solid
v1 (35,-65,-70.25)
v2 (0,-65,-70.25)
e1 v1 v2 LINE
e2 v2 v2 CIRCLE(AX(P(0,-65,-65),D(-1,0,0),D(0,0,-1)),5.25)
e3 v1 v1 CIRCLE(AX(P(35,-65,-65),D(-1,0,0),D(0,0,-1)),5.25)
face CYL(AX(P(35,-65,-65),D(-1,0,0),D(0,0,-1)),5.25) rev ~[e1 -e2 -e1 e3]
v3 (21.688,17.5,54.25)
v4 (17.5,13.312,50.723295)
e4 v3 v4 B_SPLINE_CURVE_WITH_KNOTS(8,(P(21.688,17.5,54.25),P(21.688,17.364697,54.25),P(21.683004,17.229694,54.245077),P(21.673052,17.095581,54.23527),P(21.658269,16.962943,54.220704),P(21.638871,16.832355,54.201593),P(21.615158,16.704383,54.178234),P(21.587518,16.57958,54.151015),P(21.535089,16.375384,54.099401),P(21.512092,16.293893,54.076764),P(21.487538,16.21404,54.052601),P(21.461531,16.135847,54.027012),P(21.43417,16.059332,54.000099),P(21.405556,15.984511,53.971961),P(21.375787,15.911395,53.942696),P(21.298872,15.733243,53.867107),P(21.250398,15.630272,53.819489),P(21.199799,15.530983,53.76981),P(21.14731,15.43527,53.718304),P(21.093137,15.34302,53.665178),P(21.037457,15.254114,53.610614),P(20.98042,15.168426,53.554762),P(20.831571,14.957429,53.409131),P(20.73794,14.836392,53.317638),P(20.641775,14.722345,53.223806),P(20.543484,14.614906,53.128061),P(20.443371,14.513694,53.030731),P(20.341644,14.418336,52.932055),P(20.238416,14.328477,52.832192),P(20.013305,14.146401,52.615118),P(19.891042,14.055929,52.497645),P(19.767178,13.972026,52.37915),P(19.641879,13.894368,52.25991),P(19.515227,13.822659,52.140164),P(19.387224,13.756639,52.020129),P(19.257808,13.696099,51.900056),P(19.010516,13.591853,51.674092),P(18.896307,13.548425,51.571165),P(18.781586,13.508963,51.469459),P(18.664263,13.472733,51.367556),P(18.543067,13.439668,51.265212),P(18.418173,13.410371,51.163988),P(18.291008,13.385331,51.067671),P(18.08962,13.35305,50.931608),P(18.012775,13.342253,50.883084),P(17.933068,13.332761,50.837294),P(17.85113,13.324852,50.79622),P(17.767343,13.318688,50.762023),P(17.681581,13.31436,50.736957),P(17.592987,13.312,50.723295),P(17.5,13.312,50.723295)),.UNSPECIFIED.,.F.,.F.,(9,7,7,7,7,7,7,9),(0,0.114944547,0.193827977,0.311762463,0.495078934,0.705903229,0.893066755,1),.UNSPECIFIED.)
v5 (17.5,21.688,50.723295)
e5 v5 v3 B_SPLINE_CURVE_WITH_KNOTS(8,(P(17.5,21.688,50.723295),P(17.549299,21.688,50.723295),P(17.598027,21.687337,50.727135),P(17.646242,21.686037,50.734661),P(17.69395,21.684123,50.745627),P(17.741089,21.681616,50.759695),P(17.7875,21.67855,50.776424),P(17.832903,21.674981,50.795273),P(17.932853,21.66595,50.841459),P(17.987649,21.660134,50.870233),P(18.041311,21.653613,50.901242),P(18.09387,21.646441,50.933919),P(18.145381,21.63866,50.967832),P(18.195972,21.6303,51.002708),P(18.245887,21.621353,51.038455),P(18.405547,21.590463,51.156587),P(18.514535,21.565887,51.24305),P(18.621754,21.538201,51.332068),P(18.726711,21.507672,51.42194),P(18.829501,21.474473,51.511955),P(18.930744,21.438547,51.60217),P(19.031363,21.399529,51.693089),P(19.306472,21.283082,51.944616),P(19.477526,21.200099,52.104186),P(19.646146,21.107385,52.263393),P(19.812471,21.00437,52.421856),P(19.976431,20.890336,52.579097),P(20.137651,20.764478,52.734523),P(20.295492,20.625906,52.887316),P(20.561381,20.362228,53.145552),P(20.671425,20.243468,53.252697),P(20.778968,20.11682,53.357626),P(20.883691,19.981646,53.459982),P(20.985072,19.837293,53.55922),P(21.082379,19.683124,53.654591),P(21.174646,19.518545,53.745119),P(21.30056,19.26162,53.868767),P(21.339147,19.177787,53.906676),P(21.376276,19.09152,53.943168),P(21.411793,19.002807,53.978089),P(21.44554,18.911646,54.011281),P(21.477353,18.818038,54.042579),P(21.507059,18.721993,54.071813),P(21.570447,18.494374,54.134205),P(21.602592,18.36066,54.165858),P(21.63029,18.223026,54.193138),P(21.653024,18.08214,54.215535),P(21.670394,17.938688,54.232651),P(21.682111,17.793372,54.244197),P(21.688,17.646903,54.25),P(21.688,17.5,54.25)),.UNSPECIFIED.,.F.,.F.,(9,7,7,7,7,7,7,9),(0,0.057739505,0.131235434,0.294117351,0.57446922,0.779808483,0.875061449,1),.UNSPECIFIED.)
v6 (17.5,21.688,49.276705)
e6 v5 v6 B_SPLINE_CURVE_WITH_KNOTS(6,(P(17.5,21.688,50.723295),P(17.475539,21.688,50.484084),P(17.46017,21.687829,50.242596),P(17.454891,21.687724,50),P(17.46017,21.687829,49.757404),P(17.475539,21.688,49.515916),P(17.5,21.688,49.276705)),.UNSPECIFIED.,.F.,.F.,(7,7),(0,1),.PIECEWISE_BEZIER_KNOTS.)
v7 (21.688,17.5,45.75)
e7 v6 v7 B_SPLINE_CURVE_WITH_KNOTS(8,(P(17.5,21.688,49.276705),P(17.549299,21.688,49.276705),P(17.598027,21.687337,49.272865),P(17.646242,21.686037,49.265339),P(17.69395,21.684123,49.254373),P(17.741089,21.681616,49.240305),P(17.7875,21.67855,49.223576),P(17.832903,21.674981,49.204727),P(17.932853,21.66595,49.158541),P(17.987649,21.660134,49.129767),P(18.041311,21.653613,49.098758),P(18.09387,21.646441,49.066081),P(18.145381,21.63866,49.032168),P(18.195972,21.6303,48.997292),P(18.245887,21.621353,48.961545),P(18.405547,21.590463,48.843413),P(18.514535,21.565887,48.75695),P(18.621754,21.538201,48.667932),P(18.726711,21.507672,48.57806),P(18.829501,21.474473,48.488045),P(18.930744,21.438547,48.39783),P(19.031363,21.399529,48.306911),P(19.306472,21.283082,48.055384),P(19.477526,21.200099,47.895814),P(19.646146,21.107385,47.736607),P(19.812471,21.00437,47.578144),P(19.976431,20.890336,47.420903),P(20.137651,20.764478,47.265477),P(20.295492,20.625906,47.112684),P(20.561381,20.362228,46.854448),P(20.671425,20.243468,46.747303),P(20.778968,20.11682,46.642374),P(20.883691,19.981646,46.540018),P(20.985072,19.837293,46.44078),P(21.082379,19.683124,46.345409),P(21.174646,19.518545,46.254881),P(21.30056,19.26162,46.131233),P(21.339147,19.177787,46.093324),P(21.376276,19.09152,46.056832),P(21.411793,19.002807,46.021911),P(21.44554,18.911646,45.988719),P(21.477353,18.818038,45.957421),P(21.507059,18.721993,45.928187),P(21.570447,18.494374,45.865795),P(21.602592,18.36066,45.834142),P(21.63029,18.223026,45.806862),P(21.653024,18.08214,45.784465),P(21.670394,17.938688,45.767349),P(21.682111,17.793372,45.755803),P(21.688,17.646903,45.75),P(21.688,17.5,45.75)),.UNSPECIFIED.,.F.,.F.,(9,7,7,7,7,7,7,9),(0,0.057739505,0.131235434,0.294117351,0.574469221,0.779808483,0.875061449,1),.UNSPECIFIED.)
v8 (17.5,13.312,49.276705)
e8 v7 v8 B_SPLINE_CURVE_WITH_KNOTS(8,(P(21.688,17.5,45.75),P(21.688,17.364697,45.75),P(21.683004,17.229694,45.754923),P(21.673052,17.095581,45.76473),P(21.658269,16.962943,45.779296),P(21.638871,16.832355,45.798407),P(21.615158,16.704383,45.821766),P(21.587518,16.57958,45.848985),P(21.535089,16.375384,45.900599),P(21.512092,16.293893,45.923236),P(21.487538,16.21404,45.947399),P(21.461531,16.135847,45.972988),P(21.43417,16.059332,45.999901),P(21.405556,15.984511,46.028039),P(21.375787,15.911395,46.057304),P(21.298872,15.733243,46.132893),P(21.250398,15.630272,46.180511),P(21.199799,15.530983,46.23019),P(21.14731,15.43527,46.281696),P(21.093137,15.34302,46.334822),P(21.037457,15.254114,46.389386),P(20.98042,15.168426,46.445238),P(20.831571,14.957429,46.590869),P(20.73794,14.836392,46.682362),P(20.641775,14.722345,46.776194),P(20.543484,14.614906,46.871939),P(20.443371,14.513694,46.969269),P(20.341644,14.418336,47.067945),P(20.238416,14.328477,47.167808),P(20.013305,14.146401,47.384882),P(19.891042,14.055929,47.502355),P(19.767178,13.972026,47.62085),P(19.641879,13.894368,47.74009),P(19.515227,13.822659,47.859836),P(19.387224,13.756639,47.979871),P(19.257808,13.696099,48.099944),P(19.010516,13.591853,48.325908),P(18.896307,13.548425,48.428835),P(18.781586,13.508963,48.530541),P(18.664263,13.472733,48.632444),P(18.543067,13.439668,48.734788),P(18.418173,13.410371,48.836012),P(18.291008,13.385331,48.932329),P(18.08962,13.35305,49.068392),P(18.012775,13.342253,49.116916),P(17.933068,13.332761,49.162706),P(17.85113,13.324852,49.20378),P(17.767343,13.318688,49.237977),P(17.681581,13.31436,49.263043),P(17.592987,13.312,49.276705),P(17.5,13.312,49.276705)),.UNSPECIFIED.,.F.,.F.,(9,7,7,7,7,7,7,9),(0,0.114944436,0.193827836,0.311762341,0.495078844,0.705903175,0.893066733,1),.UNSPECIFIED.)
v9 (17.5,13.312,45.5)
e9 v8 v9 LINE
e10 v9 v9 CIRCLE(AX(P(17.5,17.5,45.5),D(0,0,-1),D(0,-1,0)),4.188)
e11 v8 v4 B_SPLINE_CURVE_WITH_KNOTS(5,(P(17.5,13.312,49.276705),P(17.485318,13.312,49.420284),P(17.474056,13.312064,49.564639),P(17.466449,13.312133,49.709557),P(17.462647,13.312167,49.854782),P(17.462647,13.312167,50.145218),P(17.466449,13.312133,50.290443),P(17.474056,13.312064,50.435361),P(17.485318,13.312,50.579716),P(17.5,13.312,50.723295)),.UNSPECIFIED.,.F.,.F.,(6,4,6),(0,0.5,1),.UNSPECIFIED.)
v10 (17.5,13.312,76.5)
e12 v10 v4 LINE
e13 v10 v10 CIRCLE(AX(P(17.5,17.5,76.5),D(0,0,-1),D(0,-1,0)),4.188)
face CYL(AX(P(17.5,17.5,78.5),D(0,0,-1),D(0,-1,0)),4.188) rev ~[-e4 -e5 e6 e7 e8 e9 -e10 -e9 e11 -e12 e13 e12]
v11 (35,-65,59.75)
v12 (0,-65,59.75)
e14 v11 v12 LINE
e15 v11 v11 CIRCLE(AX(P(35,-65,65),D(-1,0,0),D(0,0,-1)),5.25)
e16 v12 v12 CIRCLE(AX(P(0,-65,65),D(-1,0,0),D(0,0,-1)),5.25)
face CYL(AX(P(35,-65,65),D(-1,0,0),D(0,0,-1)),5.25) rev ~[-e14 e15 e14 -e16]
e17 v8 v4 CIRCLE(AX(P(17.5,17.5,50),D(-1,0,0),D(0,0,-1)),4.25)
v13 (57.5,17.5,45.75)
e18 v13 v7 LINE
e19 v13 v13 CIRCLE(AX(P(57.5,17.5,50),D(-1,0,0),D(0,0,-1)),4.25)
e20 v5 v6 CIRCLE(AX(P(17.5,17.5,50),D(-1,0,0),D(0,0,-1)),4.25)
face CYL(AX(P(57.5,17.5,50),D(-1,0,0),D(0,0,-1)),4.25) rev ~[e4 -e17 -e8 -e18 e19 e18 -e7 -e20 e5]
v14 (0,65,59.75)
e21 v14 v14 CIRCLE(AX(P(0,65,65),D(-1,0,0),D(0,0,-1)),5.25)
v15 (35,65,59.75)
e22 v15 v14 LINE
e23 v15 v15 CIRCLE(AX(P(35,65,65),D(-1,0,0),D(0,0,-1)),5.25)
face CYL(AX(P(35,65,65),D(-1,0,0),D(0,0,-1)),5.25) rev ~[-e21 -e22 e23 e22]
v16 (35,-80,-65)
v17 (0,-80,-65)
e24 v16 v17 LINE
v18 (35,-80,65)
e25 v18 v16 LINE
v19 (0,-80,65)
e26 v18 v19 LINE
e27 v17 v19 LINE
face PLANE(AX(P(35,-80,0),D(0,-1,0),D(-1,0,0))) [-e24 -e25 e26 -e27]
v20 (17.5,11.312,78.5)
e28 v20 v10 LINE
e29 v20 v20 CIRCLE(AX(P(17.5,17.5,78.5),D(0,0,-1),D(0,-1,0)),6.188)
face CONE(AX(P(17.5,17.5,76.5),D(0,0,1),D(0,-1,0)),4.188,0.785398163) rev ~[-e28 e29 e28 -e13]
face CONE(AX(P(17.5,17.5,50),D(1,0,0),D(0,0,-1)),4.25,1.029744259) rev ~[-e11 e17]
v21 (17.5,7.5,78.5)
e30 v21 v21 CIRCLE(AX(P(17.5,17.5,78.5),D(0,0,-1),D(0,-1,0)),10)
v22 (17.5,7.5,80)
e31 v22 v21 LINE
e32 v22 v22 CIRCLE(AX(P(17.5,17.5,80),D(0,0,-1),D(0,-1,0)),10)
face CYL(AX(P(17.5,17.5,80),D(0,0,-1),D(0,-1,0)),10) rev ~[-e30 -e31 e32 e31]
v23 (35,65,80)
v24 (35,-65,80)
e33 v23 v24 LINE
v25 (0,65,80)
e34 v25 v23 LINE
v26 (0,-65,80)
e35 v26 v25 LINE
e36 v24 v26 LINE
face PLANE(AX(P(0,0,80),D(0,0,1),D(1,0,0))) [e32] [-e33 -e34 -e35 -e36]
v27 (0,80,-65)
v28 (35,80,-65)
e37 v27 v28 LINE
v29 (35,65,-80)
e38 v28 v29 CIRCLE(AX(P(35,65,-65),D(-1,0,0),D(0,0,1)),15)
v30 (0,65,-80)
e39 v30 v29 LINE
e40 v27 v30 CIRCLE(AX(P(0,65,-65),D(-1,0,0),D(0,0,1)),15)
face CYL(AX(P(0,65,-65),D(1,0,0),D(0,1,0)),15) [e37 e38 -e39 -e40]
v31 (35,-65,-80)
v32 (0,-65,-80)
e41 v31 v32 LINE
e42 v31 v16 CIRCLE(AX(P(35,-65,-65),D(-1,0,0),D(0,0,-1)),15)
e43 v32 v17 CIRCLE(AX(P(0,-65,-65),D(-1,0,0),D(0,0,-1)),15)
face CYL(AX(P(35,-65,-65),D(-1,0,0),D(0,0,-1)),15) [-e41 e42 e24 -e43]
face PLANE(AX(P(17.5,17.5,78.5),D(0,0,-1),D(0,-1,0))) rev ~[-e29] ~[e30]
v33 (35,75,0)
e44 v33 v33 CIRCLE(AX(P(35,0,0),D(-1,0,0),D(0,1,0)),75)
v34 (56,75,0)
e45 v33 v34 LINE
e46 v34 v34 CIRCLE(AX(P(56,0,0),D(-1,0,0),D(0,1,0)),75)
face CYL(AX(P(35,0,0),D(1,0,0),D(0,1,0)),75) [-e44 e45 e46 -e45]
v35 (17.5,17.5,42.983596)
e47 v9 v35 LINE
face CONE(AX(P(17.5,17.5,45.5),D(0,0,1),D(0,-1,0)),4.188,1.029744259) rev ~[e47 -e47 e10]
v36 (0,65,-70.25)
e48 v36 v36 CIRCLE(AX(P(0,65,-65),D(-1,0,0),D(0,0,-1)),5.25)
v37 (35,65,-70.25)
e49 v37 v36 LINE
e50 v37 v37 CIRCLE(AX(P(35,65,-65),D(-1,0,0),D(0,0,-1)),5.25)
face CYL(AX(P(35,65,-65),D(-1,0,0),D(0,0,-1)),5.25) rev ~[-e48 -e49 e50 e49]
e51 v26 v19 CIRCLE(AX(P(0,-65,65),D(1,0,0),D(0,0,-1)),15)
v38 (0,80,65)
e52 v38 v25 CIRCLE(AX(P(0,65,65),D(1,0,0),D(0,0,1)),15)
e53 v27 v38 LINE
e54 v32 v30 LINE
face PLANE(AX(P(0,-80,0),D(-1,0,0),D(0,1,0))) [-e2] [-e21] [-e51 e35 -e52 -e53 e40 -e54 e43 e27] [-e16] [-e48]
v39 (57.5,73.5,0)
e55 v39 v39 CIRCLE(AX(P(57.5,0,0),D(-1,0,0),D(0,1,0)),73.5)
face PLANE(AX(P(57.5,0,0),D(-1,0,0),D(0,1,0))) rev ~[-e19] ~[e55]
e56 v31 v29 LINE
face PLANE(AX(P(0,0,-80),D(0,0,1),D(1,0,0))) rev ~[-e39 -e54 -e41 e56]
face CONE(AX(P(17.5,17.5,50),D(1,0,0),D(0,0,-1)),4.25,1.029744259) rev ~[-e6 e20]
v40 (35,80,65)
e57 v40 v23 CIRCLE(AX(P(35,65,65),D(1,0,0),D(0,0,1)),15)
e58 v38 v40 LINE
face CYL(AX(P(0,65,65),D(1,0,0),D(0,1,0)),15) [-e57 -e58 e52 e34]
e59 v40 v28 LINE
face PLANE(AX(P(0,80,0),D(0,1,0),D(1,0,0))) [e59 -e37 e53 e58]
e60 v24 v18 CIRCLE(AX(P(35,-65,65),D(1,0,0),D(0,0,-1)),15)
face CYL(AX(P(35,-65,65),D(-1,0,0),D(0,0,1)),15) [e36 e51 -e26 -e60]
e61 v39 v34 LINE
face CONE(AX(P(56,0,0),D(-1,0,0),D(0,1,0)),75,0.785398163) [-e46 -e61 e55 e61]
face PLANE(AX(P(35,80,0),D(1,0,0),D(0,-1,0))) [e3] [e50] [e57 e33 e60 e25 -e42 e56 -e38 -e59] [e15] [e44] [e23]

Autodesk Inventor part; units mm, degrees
ref_plane "YZ Plane" through (0, 0, 0) normal (1, 0, 0) x (0, 1, 0)
ref_plane "XZ Plane" through (0, 0, 0) normal (0, 1, 0) x (-1, 0, 0)
ref_plane "XY Plane" through (0, 0, 0) normal (0, 0, 1) x (1, 0, 0)
sketch "Skizze1" plane through (0, 0, 0) normal (0, 0, 1) x (1, 0, 0)
  line L0 (0, 80) -> (35, 80)
  line L1 (35, 80) -> (35, -80)
  line L2 (35, -80) -> (0, -80)
  line L3 (0, -80) -> (0, 80)
  line L4 (35, 75) -> (57.5, 75)
  line L5 (57.5, 75) -> (57.5, 0)
  line L6 (57.5, 0) -> (35, 0)
  line L7 (35, 0) -> (35, 75)
  point P0 (0, 0)
  point P1 (0, 0)
  dimension "d0" = 160
  dimension "d1" = 150
  dimension "d2" = 57.5
  dimension "d3" = 35
extrude "Extrusion1" add sketch "Skizze1" along normal mid plane 160 contours L0 L1 L2 L3
revolve "Umdrehung1" add sketch "Skizze1" angle 360 about axis through (57.5, 0, 0) along (-1, 0, 0) contours L4 L5 L6 L1
fillet "Rundung1" radius 15 4 edges at (17.5, 80, 80) (17.5, 80, -80) (17.5, -80, 80) (17.5, -80, -80)
sketch "Skizze2" plane through (35, -65, -80) normal (1, 0, 0) x (0, 0, -1)
  line L0 (-15, 0) -> (-145, 0)
  line L1 (-145, 0) -> (-145, 130)
  line L2 (-145, 130) -> (-15, 130)
  line L3 (-15, 130) -> (-15, 0)
  line L4 (-15, 0) -> (-145, 130) construction
  line L5 (-145, 0) -> (-15, 130) construction
  point P0 (-80, 65)
  dimension "d8" = 130
  dimension "d9" = 130
hole "Bohrung1" at (35, 65, 65) at (35, 65, -65) at (35, -65, 65) at (35, -65, -65) direction (-1, 0, 0) diameter 10.5 end through all
sketch "Skizze3" plane through (0, 0, 80) normal (0, 0, 1) x (1, 0, 0)
  line L0 (35, 80) -> (0, 80) projected
  line L1 (0, 65) -> (0, -65) projected
  point P0 (0, 0)
  point P1 (17.5, 17.5)
  dimension "d17" = 62.5
  dimension "d18" = 17.5
hole "Bohrung2" at (17.5, 17.5, 80) direction (0, 0, -1) diameter 8.376 depth 34.5 tip angle 118 counterbore diameter 20 counterbore depth 1.5 thread size "M10x1.5" class "6H" standard "ISO Metric profile"
sketch "Skizze4" plane through (57.5, 0, 0) normal (1, 0, 0) x (0, 0, -1)
  line L0 (-80, -65) -> (-80, 65) projected
  line L1 (65, 80) -> (-65, 80) projected
  point P0 (0, 0)
  point P1 (-50, 17.5)
  dimension "d26" = 30
  dimension "d27" = 62.5
hole "Bohrung3" at (57.5, 17.5, 50) direction (-1, 0, 0) diameter 8.5 depth 40 tip angle 118
chamfer "Fase1" distance 2 angle 45 1 edges at (17.5, 21.688, 78.5)
chamfer "Fase2" distance 1.5 angle 45 1 edges at (57.5, -75, 0)
equation "\"d4\" = d0"
properties part number "Deckel_hinten" material "Stahl AISI 4130"
